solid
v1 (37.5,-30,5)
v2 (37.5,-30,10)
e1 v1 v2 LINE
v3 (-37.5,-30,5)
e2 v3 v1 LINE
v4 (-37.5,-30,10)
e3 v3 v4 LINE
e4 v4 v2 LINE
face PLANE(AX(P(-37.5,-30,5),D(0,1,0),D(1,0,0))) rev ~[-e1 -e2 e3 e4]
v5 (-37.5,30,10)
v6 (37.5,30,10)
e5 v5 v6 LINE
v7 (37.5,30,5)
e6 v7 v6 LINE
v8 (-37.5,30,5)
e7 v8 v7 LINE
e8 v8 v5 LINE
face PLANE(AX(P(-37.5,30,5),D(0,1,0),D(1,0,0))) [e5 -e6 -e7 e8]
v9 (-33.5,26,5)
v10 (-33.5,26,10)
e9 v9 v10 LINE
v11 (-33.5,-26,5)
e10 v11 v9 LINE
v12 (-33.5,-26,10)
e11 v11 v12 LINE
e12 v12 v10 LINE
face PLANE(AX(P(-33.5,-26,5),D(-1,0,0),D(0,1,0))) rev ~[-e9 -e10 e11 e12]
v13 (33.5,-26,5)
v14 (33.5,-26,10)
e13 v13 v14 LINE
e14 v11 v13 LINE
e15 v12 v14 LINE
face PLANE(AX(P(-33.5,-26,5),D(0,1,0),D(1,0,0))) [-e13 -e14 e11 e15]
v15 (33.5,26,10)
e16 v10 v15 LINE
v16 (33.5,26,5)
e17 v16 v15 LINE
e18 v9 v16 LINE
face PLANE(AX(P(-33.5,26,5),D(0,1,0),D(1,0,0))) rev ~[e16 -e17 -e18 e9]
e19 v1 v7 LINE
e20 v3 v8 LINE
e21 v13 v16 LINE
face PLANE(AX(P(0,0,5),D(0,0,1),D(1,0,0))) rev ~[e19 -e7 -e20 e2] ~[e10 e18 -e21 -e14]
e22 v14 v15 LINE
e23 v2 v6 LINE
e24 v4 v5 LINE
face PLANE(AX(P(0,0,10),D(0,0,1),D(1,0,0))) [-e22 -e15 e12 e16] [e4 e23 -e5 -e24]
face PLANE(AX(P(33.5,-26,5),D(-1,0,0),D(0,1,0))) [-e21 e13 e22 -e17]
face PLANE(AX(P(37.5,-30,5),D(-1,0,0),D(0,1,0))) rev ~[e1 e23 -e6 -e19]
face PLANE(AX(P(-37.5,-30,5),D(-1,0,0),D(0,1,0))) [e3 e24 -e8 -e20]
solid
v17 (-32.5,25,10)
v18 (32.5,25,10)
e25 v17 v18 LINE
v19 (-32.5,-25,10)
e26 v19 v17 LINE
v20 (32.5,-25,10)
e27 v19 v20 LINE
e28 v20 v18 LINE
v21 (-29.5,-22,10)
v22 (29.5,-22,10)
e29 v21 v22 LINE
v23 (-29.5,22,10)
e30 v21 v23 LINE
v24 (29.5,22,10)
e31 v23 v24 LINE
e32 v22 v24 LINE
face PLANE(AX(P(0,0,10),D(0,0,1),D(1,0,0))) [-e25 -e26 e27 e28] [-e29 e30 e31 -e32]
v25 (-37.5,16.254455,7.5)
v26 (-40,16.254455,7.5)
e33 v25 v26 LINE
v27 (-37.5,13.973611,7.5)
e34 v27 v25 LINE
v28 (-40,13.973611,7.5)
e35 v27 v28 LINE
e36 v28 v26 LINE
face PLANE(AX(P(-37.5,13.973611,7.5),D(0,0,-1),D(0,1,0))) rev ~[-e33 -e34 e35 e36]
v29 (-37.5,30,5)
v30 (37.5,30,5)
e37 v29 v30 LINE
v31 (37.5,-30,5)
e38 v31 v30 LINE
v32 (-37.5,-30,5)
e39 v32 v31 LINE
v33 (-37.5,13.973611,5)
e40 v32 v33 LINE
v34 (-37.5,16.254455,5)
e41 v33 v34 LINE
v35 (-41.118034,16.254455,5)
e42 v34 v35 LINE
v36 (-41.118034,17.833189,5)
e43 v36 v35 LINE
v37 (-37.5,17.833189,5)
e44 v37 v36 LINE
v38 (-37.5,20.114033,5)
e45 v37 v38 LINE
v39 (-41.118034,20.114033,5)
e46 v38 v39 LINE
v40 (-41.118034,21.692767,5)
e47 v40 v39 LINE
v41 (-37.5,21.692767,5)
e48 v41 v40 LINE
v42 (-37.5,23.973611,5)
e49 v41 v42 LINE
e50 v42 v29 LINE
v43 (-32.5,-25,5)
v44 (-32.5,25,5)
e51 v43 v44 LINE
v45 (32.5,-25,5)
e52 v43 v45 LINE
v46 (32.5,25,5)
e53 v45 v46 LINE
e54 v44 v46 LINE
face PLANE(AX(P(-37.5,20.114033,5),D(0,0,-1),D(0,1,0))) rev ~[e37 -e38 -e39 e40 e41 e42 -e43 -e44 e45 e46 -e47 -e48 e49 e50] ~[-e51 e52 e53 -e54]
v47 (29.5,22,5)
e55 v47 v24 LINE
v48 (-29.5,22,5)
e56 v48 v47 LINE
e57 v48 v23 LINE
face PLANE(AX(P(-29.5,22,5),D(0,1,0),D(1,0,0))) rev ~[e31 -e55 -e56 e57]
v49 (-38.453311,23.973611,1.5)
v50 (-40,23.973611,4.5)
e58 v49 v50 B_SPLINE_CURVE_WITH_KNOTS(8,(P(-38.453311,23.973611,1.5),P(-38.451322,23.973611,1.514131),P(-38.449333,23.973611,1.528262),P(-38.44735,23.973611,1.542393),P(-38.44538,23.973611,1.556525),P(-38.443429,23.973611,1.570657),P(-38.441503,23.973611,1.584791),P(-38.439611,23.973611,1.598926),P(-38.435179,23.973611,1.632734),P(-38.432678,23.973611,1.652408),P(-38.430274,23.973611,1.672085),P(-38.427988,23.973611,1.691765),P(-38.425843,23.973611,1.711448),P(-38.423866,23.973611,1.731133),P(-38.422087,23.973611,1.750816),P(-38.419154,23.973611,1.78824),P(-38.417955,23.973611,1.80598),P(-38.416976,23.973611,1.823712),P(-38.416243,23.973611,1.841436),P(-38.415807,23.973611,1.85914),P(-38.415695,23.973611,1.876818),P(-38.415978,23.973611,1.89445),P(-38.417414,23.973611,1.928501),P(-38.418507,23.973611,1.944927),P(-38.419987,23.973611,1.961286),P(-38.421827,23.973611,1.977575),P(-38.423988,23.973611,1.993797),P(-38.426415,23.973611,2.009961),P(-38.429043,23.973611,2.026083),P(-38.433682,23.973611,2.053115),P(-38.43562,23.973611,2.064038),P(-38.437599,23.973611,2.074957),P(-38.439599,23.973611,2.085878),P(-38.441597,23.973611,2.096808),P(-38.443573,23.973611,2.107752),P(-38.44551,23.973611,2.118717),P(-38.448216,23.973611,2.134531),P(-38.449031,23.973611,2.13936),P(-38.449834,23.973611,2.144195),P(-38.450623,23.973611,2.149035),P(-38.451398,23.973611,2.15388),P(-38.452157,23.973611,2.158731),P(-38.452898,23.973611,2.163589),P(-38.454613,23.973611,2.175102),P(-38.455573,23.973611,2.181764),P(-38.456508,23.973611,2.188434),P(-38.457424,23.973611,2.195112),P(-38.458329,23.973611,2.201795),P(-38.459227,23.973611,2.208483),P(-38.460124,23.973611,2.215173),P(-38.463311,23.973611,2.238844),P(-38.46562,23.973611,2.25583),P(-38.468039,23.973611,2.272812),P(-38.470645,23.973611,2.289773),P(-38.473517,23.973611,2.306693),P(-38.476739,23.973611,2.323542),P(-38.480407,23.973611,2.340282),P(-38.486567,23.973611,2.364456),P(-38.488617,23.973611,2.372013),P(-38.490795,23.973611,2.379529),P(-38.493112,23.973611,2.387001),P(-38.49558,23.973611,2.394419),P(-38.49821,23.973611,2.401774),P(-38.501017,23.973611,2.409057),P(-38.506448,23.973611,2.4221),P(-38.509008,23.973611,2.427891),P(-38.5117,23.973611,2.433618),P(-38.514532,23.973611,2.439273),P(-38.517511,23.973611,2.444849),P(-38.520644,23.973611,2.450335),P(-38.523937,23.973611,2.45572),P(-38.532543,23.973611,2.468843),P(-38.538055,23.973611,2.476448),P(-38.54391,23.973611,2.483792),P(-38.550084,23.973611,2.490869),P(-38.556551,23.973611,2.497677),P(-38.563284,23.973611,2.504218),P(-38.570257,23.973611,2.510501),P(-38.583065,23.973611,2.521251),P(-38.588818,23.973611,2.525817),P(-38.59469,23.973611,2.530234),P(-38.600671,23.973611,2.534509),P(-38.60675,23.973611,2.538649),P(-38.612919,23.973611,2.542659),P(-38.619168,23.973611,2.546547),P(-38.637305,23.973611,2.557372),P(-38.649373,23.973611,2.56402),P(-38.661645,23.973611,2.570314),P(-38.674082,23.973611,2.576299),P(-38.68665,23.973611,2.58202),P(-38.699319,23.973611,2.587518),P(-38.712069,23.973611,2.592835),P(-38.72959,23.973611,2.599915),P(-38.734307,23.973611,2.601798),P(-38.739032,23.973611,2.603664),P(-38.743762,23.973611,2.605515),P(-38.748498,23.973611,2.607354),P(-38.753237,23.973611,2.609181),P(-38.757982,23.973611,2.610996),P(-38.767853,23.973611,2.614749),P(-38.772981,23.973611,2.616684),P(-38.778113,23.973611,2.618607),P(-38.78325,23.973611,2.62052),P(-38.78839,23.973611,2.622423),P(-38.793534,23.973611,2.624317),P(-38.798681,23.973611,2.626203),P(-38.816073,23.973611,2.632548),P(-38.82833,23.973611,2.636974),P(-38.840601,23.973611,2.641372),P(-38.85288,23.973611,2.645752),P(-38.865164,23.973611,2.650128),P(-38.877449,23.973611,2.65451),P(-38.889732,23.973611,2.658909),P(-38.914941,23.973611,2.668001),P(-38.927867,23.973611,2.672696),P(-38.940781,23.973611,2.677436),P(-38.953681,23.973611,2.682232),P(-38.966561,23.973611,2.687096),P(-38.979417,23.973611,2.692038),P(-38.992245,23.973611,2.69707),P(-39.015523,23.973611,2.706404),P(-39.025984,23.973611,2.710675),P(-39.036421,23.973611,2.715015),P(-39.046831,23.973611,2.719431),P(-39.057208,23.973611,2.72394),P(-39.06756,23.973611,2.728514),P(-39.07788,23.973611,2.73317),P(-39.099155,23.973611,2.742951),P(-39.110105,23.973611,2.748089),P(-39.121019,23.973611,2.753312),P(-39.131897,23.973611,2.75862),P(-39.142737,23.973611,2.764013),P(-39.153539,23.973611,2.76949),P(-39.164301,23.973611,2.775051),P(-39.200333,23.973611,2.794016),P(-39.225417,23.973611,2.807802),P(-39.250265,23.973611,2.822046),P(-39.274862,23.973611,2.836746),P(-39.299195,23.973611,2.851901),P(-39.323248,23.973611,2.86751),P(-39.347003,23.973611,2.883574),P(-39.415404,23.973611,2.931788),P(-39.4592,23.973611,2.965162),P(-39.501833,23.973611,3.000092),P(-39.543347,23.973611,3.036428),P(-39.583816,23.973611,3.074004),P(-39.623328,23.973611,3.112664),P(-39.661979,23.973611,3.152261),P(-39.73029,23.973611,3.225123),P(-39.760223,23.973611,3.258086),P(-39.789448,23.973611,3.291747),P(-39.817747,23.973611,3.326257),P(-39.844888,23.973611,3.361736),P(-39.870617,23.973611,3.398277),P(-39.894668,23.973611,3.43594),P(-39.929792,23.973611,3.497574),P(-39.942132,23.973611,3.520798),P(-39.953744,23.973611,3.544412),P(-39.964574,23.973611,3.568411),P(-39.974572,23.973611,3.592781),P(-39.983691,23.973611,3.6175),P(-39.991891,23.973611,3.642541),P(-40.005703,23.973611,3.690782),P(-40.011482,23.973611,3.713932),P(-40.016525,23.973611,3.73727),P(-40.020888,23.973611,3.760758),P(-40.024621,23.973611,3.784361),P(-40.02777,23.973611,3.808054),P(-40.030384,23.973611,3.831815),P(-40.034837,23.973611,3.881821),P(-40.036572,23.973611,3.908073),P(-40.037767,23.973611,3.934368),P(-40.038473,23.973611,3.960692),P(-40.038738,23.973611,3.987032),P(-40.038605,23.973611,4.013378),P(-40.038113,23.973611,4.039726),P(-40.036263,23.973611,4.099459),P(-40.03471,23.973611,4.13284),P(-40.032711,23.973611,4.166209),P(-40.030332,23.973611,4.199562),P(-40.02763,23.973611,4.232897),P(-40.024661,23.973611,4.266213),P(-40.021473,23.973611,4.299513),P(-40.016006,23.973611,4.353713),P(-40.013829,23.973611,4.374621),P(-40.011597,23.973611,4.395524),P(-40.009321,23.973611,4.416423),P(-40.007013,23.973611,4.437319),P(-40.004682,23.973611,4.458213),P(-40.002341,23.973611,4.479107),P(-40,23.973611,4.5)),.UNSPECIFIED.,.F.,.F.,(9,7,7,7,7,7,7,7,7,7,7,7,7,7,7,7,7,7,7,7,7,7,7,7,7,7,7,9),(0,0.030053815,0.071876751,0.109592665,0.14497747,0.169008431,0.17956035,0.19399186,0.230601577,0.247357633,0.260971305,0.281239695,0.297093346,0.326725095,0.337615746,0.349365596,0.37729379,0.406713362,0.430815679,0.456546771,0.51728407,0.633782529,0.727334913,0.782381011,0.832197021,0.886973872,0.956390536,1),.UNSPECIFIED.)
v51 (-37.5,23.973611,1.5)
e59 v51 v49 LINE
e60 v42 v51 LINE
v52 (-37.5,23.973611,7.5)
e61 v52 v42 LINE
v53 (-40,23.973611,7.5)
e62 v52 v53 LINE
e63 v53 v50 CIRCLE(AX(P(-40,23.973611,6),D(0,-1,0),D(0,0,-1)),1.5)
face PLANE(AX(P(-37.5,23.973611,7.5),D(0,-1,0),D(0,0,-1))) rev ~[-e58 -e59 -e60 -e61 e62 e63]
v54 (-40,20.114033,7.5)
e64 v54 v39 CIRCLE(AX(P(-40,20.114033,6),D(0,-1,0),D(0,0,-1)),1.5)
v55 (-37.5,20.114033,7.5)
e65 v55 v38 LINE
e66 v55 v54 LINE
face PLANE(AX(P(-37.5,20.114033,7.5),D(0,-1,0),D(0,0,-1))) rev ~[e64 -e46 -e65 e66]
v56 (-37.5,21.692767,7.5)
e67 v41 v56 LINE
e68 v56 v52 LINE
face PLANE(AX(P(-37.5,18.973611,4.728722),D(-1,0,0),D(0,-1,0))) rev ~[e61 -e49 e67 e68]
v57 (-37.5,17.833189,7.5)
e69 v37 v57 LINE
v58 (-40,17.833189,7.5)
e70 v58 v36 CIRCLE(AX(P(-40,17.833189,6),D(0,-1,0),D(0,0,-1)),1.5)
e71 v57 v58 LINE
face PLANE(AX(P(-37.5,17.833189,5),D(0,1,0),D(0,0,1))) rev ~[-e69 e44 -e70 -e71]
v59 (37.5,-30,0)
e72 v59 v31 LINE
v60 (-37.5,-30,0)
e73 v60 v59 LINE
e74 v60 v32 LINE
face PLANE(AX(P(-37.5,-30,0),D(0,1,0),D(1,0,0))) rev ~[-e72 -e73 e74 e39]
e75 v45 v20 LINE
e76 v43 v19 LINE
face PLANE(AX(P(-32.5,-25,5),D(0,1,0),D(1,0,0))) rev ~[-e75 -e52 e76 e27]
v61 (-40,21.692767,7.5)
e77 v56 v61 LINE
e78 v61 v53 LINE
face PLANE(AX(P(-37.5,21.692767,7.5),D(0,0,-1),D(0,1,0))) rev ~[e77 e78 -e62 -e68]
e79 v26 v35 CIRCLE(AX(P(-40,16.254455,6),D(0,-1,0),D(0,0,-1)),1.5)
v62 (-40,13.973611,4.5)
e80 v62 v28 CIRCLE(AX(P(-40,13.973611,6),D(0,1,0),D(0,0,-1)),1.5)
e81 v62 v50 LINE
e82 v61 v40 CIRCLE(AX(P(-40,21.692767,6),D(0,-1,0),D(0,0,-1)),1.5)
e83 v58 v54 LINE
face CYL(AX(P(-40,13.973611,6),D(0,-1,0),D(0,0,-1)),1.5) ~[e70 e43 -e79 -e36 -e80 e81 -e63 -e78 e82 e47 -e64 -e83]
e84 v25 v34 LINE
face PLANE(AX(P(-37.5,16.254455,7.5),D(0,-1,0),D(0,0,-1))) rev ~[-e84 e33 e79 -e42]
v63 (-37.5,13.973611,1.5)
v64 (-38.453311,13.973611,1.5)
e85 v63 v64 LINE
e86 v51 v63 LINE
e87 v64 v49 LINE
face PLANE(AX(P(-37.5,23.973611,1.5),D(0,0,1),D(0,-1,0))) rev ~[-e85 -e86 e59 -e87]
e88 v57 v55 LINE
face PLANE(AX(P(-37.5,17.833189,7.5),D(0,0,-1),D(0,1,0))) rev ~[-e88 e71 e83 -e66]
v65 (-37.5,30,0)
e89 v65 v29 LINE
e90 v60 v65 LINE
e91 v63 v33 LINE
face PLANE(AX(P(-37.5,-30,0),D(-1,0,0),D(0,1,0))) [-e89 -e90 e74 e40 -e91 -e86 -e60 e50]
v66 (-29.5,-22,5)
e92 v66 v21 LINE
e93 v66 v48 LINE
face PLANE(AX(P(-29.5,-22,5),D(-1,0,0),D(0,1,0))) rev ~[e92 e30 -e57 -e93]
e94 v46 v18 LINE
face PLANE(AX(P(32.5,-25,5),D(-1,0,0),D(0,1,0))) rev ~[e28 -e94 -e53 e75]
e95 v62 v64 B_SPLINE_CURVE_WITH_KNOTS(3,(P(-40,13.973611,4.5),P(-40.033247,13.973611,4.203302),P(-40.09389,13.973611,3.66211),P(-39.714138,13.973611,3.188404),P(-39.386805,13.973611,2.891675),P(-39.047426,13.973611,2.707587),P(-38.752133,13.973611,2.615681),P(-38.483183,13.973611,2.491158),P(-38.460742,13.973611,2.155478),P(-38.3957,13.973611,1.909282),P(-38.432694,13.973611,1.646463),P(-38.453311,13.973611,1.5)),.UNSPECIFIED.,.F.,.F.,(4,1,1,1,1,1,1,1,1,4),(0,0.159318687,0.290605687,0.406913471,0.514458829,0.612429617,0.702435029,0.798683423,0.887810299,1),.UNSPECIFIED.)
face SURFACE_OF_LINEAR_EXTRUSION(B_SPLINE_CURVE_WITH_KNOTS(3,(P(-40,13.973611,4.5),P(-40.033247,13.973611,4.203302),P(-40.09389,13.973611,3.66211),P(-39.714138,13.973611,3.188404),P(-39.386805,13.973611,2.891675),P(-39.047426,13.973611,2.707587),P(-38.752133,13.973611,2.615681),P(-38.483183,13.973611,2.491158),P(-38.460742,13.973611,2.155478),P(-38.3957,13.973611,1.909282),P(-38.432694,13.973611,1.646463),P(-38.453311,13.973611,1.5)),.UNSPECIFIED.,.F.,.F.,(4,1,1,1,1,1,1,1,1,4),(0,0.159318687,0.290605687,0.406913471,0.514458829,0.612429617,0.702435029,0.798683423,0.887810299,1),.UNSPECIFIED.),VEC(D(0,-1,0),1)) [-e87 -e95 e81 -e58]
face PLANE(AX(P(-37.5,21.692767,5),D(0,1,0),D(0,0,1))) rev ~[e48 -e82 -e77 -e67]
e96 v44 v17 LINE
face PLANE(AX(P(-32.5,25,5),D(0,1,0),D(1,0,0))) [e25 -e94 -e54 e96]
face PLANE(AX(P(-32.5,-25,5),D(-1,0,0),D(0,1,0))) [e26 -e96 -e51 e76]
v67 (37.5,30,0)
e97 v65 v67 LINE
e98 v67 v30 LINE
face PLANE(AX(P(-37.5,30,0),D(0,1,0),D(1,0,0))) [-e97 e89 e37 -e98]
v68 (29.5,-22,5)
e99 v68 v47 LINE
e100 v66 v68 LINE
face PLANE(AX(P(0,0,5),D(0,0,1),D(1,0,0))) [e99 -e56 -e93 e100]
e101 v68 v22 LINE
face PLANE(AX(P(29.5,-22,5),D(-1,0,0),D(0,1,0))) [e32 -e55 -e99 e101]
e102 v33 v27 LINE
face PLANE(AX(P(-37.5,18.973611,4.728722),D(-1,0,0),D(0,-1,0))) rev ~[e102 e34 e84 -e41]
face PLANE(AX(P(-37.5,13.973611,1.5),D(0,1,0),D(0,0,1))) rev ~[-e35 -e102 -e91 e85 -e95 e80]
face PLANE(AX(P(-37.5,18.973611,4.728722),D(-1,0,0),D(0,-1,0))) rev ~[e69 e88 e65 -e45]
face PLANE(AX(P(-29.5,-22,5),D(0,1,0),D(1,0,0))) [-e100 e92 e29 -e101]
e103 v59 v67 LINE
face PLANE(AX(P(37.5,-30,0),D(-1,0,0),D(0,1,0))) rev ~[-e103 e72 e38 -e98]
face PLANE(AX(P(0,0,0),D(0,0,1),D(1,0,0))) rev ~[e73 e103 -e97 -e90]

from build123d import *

# Parameters (mm, degrees)
F0_W     = 75
F0_H     = 60
F1_DEPTH = 5
F2_W     = 65
F2_H     = 50
F2_W_2   = 59
F2_H_2   = 44
F3_DEPTH = 5
F4_W     = 75
F4_H     = 60
F4_W_2   = 67
F4_H_2   = 52
F5_DEPTH = 5
F7_DEPTH = 5
F9_DEPTH = 16.0273892857


with BuildPart() as f1:
    # F0 (on Top) → F1 (new body)
    with BuildSketch(Plane.XY):
        Rectangle(F0_W, F0_H)
    extrude(amount=F1_DEPTH)

    # F2 (on face) → F3 (join)
    with BuildSketch(Plane.XY.offset(5)):
        Rectangle(F2_W, F2_H)
        Rectangle(F2_W_2, F2_H_2, mode=Mode.SUBTRACT)
    extrude(amount=F3_DEPTH)

    # F6 (on face) → F7 (join)
    with BuildSketch(Plane(origin=(-37.5, 0, 0), x_dir=(0, -1, 0), z_dir=(-1, 0, 0))):
        Polygon((-21.6927667481, 7.5), (-23.9736107143, 7.5), (-23.9736107143, 1.5), (-13.9736107143, 1.5), (-13.9736107143, 7.5), (-16.2544546806, 7.5), (-16.2544546806, 5), (-17.8331887312, 5), (-17.8331887312, 7.5), (-20.1140326975, 7.5), (-20.1140326975, 5), (-21.6927667481, 5), align=None)
    extrude(amount=F7_DEPTH)

    # F8 (on face) → F9 (cut, through all)
    with BuildSketch(Plane.XZ.offset(-13.9736107143)):
        with BuildLine():
            Line((-42.5, 7.5), (-42.5, 1.5))
            Line((-42.5, 1.5), (-38.4533107281, 1.5))
            add(Edge.make_bspline(
                [(-40, 4.5), (-40.0332466707, 4.2033021988), (-40.0938903512, 3.6621097631), (-39.7141378275, 3.1884036491), (-39.3868051904, 2.8916751674), (-39.0474258601, 2.7075872934), (-38.7521333356, 2.615680849), (-38.4831825305, 2.4911583946), (-38.4607419928, 2.1554776724), (-38.3956996392, 1.9092815912), (-38.4326943281, 1.6464633482), (-38.4533107281, 1.5)],
                knots=[0, 0, 0, 0, 0.1593186871, 0.290605687, 0.4069134712, 0.5144588289, 0.6124296172, 0.7024350291, 0.7986834225, 0.8878102994, 1, 1, 1, 1], degree=3))
            ThreePointArc((-40, 4.5), (-41.5, 6), (-40, 7.5))
            Line((-40, 7.5), (-42.5, 7.5))
        make_face()
    extrude(amount=-F9_DEPTH, mode=Mode.SUBTRACT)


with BuildPart() as f5:
    # F4 (on face) → F5 (new body)
    with BuildSketch(Plane.XY.offset(5)):
        Rectangle(F4_W, F4_H)
        Rectangle(F4_W_2, F4_H_2, mode=Mode.SUBTRACT)
    extrude(amount=F5_DEPTH)


solid = Compound([f1.part, f5.part])
